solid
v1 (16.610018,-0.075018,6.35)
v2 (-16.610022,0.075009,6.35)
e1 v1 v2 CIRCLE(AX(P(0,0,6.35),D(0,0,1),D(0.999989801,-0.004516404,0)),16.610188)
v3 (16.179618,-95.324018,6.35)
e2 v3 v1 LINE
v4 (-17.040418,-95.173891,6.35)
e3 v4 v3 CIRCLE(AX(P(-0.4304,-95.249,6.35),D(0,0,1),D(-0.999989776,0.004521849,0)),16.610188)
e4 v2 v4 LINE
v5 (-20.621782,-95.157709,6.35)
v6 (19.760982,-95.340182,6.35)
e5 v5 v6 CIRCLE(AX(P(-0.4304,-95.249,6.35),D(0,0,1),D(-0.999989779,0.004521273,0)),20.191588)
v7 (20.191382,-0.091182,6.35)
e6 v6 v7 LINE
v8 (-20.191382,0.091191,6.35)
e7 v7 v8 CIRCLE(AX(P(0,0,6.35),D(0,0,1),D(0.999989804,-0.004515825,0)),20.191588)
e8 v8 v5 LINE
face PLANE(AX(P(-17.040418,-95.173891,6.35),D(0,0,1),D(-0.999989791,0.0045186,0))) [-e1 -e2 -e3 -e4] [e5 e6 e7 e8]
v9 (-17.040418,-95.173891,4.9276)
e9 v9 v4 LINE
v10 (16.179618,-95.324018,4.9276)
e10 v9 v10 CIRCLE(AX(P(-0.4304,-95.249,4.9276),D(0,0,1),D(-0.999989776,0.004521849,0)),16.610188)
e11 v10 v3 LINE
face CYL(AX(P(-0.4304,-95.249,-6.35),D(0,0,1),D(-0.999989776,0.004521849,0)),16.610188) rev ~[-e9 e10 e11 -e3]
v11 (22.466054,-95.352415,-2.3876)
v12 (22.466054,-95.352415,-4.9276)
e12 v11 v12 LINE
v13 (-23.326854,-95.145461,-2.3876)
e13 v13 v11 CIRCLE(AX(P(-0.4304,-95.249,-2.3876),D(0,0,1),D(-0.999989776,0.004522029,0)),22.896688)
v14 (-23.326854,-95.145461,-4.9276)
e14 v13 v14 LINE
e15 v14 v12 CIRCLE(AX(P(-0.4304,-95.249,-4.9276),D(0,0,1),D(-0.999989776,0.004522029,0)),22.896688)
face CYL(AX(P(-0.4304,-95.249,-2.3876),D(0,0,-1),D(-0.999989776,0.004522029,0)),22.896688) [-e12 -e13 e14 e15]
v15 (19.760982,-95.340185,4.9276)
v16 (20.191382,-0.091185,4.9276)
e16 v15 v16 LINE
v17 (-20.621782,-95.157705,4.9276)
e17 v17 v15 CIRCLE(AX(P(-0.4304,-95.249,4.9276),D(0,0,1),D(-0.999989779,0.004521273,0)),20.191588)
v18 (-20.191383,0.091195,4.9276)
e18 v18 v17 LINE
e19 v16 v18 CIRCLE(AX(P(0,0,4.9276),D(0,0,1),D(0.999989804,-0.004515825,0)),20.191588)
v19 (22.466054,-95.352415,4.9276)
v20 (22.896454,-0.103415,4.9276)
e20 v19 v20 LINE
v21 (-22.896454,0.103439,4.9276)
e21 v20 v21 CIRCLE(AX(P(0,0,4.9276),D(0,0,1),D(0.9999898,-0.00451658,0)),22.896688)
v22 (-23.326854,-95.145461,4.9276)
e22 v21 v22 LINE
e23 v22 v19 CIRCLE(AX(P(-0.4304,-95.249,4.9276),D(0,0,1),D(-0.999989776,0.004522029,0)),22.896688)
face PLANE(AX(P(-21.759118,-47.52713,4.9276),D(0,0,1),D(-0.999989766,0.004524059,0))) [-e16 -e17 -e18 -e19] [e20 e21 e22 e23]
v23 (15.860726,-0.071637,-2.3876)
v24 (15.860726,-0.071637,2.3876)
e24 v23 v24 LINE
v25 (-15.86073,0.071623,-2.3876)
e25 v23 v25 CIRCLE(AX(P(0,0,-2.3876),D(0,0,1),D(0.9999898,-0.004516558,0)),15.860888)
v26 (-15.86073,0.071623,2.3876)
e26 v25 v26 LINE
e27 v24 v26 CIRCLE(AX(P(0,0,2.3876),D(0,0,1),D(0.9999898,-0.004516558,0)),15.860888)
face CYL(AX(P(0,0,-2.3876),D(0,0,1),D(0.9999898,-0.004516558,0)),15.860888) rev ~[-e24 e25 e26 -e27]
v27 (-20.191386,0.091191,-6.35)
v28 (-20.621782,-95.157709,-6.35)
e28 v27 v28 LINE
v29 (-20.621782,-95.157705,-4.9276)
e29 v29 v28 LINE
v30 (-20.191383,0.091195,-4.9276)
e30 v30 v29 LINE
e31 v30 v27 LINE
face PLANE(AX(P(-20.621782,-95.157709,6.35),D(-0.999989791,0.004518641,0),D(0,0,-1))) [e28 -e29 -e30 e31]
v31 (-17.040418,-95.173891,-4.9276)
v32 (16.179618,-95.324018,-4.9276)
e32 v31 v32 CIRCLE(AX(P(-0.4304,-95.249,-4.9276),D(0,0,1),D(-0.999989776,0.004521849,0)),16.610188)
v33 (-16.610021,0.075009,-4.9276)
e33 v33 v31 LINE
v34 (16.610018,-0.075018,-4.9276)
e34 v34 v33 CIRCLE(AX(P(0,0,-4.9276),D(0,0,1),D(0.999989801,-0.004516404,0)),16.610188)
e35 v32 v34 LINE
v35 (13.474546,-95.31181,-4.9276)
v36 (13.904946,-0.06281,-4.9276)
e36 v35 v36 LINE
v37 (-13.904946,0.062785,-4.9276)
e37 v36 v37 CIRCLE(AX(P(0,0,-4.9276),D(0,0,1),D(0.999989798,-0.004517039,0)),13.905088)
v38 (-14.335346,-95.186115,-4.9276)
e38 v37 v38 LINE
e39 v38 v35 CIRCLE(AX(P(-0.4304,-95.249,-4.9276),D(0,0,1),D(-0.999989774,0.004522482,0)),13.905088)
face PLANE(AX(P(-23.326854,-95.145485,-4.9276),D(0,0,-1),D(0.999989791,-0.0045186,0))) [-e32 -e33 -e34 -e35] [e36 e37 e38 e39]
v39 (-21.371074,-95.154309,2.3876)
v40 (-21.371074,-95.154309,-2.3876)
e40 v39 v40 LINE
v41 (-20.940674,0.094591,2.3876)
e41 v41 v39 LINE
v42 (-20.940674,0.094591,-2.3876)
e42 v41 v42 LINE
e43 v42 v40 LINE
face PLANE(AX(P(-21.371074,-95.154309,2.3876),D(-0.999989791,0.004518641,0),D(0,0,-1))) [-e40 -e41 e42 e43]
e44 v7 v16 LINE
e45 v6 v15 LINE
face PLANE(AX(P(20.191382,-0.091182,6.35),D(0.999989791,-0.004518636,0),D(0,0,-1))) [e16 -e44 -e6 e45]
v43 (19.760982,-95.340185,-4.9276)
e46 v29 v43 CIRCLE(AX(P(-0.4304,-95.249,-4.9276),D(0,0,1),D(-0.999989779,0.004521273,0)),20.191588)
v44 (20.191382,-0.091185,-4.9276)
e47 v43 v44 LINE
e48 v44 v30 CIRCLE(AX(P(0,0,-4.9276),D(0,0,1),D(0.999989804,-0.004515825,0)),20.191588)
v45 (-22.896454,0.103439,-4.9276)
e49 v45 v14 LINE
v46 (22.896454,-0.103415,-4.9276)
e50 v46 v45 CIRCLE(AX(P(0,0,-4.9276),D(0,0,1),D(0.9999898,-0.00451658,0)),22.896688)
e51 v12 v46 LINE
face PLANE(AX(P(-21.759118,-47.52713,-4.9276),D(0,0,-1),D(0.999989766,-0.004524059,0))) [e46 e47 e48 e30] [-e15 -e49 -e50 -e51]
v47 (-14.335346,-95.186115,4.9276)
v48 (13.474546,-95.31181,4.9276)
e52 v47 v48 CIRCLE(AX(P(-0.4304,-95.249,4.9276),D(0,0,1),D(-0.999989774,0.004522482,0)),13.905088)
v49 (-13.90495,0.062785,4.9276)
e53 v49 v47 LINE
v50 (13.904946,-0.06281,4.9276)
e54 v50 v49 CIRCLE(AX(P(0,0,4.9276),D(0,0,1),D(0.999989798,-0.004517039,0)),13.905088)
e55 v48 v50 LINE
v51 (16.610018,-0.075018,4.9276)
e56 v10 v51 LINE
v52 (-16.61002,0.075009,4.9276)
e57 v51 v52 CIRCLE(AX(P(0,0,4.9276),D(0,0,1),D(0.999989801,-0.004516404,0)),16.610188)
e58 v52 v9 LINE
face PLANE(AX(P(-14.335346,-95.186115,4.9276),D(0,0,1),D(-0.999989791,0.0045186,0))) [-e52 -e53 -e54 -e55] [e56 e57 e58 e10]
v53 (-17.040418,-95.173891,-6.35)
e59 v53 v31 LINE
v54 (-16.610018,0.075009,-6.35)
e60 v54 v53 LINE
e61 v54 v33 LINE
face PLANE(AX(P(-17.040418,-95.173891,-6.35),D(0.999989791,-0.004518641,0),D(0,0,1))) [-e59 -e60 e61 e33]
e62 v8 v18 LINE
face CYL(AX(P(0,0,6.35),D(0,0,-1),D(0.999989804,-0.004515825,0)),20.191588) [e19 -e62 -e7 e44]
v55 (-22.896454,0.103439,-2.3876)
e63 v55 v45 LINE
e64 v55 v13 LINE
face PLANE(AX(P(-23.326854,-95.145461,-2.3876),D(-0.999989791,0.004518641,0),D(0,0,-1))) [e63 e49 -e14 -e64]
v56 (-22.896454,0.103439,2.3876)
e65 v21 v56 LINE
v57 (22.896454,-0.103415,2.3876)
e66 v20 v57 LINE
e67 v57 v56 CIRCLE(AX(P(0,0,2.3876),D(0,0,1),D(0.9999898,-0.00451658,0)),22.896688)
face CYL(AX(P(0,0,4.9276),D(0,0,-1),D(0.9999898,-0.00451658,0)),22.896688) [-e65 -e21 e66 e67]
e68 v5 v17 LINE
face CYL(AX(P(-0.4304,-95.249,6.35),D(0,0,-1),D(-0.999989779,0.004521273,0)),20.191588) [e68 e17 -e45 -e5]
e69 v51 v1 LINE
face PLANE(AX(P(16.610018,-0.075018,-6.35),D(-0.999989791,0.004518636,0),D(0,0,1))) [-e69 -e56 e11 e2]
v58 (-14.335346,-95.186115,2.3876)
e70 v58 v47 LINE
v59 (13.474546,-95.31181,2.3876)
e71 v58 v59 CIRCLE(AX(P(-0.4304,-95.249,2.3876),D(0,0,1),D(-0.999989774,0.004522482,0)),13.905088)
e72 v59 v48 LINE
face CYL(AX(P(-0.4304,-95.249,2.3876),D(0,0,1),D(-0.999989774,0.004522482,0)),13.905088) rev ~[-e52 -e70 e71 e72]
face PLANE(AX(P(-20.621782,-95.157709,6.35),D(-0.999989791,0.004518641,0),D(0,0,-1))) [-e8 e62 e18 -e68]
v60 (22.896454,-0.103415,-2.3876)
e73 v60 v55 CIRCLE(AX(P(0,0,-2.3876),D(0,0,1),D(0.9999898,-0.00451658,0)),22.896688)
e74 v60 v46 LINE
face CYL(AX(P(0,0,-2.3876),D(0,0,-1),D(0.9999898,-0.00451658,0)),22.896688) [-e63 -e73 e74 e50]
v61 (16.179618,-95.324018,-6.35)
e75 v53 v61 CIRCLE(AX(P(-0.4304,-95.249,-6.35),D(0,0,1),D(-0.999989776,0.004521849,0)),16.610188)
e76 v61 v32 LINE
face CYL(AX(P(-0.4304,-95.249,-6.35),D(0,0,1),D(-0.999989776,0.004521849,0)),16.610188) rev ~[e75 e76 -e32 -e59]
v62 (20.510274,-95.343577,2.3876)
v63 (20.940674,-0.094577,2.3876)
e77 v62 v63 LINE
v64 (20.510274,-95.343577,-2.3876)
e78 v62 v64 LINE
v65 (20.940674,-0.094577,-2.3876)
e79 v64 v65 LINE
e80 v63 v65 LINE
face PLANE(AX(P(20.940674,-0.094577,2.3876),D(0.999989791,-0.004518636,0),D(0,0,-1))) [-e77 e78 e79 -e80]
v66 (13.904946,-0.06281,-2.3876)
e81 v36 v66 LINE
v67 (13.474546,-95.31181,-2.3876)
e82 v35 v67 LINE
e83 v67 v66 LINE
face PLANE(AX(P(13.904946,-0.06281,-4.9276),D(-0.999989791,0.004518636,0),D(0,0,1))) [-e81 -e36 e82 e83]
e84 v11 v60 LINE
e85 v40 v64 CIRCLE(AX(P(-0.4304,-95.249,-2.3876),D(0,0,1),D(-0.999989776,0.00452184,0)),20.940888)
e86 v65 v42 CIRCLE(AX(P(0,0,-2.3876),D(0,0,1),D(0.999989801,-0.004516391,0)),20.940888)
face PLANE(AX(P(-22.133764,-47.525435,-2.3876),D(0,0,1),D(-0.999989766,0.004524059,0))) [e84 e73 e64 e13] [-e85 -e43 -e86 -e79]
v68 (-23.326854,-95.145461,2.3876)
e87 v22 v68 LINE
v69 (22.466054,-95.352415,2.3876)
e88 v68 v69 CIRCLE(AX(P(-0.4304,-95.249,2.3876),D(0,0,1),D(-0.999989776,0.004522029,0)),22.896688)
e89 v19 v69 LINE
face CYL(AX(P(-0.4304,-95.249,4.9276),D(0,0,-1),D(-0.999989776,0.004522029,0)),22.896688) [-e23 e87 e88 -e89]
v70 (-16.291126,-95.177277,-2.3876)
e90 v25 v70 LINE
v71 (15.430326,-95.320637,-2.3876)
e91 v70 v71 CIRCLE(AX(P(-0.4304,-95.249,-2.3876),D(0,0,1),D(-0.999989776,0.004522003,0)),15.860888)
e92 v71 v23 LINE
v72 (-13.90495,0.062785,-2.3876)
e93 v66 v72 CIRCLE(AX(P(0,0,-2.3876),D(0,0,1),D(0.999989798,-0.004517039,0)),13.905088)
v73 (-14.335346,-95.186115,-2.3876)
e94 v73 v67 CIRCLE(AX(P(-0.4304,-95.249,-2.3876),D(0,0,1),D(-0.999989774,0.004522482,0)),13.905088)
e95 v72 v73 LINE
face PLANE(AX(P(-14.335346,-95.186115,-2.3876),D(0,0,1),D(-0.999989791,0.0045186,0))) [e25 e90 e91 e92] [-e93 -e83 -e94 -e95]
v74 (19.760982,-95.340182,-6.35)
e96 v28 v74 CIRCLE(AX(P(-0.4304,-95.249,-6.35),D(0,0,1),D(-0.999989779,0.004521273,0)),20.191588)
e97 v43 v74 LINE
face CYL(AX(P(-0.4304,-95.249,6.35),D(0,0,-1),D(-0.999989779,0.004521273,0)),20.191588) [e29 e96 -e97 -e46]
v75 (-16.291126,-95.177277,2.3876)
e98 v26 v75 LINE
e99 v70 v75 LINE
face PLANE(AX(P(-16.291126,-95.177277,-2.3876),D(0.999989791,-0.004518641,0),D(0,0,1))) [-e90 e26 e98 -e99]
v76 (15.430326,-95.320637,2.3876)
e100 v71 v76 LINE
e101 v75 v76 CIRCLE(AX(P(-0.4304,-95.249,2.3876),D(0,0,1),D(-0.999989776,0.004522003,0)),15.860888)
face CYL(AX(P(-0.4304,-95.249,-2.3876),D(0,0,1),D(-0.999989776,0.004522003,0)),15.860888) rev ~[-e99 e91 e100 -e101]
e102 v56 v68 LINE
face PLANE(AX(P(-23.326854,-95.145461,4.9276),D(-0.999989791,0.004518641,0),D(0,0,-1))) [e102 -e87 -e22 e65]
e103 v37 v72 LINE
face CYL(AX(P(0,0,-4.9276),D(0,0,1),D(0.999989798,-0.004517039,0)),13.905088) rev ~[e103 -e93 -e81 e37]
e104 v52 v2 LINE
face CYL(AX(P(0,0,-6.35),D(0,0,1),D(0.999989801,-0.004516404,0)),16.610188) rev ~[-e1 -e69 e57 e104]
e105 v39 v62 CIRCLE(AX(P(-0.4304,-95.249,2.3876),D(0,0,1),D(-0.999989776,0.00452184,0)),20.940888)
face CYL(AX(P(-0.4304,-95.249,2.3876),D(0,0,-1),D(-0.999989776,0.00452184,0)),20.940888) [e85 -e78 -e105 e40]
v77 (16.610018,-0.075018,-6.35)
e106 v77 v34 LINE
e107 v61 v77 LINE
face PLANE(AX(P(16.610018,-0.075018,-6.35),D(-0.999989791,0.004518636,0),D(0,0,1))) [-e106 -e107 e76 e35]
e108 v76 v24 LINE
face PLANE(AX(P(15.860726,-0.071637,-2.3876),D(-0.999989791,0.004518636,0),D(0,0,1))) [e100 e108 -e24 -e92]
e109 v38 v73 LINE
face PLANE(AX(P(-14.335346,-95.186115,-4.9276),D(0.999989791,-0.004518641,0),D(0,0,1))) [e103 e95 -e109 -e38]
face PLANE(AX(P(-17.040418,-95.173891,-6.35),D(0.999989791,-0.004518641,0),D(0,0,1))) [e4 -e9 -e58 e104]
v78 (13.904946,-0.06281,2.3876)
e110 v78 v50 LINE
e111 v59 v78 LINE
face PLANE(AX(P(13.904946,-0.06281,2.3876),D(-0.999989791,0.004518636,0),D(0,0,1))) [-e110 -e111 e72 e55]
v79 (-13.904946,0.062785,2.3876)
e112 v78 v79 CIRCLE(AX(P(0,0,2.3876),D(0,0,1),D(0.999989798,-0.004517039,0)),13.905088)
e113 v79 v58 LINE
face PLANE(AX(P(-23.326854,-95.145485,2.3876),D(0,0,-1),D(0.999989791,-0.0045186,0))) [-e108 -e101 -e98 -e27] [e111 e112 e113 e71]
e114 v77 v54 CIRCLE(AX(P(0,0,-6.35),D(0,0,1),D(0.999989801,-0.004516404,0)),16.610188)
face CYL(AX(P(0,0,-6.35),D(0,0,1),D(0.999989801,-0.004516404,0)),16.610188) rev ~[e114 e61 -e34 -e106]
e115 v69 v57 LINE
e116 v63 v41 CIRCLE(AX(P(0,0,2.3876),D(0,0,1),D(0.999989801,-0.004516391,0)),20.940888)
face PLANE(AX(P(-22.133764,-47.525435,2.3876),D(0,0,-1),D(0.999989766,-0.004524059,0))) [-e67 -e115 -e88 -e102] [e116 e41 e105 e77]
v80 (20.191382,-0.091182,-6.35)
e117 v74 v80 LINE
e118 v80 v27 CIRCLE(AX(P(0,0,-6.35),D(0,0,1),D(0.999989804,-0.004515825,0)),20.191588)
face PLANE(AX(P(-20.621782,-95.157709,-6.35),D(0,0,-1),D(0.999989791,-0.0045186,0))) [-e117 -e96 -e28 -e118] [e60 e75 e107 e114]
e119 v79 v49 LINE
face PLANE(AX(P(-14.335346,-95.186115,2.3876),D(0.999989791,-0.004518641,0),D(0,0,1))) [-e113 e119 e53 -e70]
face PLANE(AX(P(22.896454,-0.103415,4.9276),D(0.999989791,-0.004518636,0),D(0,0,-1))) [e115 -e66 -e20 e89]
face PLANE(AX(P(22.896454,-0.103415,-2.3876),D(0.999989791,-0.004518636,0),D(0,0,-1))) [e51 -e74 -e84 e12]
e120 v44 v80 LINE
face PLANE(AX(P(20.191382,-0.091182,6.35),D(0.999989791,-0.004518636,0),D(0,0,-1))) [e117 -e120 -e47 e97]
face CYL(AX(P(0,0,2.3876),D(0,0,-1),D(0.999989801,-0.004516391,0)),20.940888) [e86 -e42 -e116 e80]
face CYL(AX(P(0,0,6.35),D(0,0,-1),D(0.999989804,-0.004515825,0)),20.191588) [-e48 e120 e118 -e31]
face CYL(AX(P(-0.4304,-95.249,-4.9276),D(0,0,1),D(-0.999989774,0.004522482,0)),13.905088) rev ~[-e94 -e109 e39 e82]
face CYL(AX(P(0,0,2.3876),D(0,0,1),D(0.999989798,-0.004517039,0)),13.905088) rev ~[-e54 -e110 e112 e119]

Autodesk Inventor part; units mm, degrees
ref_plane "Work Plane2" through (0, 0, 0) normal (-1, 0, 0) x (0, 0, 1)
ref_plane "Work Plane3" through (-0.4304, -95.249, 0) normal (0.5, 0.8660254, 0) x (0, 0, 1)
sketch "Path" plane through (0, 0, 0) normal (0, 0, 1) x (1, 0, 0)
  arc A0 (18.4007, -0.0831) -> (-18.4007, 0.0831) centre (0, 0) ccw
  arc A1 (-18.8311, -95.1658) -> (17.9703, -95.3321) centre (-0.4304, -95.249) ccw
  line L0 (-18.8311, -95.1658) -> (-18.4007, 0.0831)
  line L1 (18.4007, -0.0831) -> (17.9703, -95.3321)
  dimension "d31" = 8.9916
ref_plane "Section Plane" through (-18.4007, 0.0831, 0) normal (-0.0045186, -0.9999898, 0) x (0, 0, 1)
sketch "Section Sketch" plane through (-18.4007, 0.0831, 0) normal (-0.0045186, -0.9999898, 0) x (0, 0, 1)
  line L0 (-6.35, -1.7907) -> (6.35, -1.7907)
  line L1 (6.35, -1.7907) -> (6.35, 1.7907)
  line L2 (6.35, 1.7907) -> (-6.35, 1.7907)
  line L3 (-6.35, 1.7907) -> (-6.35, -1.7907)
  line L4 (-2.3876, -2.54) -> (2.3876, -2.54)
  line L5 (2.3876, -2.54) -> (2.3876, 2.54)
  line L6 (2.3876, 2.54) -> (-2.3876, 2.54)
  line L7 (-2.3876, 2.54) -> (-2.3876, -2.54)
  line L8 (-2.3876, 0) -> (2.3876, 0) construction
  line L9 (-4.9276, -4.4958) -> (-2.3876, -4.4958)
  line L10 (-2.3876, -4.4958) -> (-2.3876, 4.4958)
  line L11 (-2.3876, 4.4958) -> (-4.9276, 4.4958)
  line L12 (-4.9276, 4.4958) -> (-4.9276, -4.4958)
  line L13 (2.3876, -4.4958) -> (4.9276, -4.4958)
  line L14 (4.9276, -4.4958) -> (4.9276, 4.4958)
  line L15 (4.9276, 4.4958) -> (2.3876, 4.4958)
  line L16 (2.3876, 4.4958) -> (2.3876, -4.4958)
  line L17 (-6.35, 0) -> (6.35, 0) construction
  point P0 (0, 0)
  point P1 (0, 0)
  dimension "d21" = 3.5814
  dimension "d22" = 5.08
  dimension "d23" = 4.7752
  dimension "d24" = 2.54
  dimension "d31" = 8.9916
  dimension "d32" = 12.7
sweep "Solid" add profiles "Section Sketch" path "Path"
pattern_of_one "Strand Pattern"
equation "\"d21\" = da_d2"
equation "\"d22\" = da_d1"
equation "\"d23\" = da_b1"
equation "\"d24\" = da_t1 + da_t2"
equation "\"d30\" = da_pt"
equation "\"da_p\" = 9.525"
equation "\"da_b1\" = 4.7752"
equation "\"da_h2\" = 8.9916"
equation "\"da_h3\" = 7.7978"
equation "\"da_d1\" = 5.08"
equation "\"da_d2\" = 3.5814"
equation "\"da_pt\" = 10.1346"
equation "\"da_b\" = 12.7"
equation "\"da_t1\" = 1.27"
equation "\"da_t2\" = 1.27"
properties part number "Roller Chain"
